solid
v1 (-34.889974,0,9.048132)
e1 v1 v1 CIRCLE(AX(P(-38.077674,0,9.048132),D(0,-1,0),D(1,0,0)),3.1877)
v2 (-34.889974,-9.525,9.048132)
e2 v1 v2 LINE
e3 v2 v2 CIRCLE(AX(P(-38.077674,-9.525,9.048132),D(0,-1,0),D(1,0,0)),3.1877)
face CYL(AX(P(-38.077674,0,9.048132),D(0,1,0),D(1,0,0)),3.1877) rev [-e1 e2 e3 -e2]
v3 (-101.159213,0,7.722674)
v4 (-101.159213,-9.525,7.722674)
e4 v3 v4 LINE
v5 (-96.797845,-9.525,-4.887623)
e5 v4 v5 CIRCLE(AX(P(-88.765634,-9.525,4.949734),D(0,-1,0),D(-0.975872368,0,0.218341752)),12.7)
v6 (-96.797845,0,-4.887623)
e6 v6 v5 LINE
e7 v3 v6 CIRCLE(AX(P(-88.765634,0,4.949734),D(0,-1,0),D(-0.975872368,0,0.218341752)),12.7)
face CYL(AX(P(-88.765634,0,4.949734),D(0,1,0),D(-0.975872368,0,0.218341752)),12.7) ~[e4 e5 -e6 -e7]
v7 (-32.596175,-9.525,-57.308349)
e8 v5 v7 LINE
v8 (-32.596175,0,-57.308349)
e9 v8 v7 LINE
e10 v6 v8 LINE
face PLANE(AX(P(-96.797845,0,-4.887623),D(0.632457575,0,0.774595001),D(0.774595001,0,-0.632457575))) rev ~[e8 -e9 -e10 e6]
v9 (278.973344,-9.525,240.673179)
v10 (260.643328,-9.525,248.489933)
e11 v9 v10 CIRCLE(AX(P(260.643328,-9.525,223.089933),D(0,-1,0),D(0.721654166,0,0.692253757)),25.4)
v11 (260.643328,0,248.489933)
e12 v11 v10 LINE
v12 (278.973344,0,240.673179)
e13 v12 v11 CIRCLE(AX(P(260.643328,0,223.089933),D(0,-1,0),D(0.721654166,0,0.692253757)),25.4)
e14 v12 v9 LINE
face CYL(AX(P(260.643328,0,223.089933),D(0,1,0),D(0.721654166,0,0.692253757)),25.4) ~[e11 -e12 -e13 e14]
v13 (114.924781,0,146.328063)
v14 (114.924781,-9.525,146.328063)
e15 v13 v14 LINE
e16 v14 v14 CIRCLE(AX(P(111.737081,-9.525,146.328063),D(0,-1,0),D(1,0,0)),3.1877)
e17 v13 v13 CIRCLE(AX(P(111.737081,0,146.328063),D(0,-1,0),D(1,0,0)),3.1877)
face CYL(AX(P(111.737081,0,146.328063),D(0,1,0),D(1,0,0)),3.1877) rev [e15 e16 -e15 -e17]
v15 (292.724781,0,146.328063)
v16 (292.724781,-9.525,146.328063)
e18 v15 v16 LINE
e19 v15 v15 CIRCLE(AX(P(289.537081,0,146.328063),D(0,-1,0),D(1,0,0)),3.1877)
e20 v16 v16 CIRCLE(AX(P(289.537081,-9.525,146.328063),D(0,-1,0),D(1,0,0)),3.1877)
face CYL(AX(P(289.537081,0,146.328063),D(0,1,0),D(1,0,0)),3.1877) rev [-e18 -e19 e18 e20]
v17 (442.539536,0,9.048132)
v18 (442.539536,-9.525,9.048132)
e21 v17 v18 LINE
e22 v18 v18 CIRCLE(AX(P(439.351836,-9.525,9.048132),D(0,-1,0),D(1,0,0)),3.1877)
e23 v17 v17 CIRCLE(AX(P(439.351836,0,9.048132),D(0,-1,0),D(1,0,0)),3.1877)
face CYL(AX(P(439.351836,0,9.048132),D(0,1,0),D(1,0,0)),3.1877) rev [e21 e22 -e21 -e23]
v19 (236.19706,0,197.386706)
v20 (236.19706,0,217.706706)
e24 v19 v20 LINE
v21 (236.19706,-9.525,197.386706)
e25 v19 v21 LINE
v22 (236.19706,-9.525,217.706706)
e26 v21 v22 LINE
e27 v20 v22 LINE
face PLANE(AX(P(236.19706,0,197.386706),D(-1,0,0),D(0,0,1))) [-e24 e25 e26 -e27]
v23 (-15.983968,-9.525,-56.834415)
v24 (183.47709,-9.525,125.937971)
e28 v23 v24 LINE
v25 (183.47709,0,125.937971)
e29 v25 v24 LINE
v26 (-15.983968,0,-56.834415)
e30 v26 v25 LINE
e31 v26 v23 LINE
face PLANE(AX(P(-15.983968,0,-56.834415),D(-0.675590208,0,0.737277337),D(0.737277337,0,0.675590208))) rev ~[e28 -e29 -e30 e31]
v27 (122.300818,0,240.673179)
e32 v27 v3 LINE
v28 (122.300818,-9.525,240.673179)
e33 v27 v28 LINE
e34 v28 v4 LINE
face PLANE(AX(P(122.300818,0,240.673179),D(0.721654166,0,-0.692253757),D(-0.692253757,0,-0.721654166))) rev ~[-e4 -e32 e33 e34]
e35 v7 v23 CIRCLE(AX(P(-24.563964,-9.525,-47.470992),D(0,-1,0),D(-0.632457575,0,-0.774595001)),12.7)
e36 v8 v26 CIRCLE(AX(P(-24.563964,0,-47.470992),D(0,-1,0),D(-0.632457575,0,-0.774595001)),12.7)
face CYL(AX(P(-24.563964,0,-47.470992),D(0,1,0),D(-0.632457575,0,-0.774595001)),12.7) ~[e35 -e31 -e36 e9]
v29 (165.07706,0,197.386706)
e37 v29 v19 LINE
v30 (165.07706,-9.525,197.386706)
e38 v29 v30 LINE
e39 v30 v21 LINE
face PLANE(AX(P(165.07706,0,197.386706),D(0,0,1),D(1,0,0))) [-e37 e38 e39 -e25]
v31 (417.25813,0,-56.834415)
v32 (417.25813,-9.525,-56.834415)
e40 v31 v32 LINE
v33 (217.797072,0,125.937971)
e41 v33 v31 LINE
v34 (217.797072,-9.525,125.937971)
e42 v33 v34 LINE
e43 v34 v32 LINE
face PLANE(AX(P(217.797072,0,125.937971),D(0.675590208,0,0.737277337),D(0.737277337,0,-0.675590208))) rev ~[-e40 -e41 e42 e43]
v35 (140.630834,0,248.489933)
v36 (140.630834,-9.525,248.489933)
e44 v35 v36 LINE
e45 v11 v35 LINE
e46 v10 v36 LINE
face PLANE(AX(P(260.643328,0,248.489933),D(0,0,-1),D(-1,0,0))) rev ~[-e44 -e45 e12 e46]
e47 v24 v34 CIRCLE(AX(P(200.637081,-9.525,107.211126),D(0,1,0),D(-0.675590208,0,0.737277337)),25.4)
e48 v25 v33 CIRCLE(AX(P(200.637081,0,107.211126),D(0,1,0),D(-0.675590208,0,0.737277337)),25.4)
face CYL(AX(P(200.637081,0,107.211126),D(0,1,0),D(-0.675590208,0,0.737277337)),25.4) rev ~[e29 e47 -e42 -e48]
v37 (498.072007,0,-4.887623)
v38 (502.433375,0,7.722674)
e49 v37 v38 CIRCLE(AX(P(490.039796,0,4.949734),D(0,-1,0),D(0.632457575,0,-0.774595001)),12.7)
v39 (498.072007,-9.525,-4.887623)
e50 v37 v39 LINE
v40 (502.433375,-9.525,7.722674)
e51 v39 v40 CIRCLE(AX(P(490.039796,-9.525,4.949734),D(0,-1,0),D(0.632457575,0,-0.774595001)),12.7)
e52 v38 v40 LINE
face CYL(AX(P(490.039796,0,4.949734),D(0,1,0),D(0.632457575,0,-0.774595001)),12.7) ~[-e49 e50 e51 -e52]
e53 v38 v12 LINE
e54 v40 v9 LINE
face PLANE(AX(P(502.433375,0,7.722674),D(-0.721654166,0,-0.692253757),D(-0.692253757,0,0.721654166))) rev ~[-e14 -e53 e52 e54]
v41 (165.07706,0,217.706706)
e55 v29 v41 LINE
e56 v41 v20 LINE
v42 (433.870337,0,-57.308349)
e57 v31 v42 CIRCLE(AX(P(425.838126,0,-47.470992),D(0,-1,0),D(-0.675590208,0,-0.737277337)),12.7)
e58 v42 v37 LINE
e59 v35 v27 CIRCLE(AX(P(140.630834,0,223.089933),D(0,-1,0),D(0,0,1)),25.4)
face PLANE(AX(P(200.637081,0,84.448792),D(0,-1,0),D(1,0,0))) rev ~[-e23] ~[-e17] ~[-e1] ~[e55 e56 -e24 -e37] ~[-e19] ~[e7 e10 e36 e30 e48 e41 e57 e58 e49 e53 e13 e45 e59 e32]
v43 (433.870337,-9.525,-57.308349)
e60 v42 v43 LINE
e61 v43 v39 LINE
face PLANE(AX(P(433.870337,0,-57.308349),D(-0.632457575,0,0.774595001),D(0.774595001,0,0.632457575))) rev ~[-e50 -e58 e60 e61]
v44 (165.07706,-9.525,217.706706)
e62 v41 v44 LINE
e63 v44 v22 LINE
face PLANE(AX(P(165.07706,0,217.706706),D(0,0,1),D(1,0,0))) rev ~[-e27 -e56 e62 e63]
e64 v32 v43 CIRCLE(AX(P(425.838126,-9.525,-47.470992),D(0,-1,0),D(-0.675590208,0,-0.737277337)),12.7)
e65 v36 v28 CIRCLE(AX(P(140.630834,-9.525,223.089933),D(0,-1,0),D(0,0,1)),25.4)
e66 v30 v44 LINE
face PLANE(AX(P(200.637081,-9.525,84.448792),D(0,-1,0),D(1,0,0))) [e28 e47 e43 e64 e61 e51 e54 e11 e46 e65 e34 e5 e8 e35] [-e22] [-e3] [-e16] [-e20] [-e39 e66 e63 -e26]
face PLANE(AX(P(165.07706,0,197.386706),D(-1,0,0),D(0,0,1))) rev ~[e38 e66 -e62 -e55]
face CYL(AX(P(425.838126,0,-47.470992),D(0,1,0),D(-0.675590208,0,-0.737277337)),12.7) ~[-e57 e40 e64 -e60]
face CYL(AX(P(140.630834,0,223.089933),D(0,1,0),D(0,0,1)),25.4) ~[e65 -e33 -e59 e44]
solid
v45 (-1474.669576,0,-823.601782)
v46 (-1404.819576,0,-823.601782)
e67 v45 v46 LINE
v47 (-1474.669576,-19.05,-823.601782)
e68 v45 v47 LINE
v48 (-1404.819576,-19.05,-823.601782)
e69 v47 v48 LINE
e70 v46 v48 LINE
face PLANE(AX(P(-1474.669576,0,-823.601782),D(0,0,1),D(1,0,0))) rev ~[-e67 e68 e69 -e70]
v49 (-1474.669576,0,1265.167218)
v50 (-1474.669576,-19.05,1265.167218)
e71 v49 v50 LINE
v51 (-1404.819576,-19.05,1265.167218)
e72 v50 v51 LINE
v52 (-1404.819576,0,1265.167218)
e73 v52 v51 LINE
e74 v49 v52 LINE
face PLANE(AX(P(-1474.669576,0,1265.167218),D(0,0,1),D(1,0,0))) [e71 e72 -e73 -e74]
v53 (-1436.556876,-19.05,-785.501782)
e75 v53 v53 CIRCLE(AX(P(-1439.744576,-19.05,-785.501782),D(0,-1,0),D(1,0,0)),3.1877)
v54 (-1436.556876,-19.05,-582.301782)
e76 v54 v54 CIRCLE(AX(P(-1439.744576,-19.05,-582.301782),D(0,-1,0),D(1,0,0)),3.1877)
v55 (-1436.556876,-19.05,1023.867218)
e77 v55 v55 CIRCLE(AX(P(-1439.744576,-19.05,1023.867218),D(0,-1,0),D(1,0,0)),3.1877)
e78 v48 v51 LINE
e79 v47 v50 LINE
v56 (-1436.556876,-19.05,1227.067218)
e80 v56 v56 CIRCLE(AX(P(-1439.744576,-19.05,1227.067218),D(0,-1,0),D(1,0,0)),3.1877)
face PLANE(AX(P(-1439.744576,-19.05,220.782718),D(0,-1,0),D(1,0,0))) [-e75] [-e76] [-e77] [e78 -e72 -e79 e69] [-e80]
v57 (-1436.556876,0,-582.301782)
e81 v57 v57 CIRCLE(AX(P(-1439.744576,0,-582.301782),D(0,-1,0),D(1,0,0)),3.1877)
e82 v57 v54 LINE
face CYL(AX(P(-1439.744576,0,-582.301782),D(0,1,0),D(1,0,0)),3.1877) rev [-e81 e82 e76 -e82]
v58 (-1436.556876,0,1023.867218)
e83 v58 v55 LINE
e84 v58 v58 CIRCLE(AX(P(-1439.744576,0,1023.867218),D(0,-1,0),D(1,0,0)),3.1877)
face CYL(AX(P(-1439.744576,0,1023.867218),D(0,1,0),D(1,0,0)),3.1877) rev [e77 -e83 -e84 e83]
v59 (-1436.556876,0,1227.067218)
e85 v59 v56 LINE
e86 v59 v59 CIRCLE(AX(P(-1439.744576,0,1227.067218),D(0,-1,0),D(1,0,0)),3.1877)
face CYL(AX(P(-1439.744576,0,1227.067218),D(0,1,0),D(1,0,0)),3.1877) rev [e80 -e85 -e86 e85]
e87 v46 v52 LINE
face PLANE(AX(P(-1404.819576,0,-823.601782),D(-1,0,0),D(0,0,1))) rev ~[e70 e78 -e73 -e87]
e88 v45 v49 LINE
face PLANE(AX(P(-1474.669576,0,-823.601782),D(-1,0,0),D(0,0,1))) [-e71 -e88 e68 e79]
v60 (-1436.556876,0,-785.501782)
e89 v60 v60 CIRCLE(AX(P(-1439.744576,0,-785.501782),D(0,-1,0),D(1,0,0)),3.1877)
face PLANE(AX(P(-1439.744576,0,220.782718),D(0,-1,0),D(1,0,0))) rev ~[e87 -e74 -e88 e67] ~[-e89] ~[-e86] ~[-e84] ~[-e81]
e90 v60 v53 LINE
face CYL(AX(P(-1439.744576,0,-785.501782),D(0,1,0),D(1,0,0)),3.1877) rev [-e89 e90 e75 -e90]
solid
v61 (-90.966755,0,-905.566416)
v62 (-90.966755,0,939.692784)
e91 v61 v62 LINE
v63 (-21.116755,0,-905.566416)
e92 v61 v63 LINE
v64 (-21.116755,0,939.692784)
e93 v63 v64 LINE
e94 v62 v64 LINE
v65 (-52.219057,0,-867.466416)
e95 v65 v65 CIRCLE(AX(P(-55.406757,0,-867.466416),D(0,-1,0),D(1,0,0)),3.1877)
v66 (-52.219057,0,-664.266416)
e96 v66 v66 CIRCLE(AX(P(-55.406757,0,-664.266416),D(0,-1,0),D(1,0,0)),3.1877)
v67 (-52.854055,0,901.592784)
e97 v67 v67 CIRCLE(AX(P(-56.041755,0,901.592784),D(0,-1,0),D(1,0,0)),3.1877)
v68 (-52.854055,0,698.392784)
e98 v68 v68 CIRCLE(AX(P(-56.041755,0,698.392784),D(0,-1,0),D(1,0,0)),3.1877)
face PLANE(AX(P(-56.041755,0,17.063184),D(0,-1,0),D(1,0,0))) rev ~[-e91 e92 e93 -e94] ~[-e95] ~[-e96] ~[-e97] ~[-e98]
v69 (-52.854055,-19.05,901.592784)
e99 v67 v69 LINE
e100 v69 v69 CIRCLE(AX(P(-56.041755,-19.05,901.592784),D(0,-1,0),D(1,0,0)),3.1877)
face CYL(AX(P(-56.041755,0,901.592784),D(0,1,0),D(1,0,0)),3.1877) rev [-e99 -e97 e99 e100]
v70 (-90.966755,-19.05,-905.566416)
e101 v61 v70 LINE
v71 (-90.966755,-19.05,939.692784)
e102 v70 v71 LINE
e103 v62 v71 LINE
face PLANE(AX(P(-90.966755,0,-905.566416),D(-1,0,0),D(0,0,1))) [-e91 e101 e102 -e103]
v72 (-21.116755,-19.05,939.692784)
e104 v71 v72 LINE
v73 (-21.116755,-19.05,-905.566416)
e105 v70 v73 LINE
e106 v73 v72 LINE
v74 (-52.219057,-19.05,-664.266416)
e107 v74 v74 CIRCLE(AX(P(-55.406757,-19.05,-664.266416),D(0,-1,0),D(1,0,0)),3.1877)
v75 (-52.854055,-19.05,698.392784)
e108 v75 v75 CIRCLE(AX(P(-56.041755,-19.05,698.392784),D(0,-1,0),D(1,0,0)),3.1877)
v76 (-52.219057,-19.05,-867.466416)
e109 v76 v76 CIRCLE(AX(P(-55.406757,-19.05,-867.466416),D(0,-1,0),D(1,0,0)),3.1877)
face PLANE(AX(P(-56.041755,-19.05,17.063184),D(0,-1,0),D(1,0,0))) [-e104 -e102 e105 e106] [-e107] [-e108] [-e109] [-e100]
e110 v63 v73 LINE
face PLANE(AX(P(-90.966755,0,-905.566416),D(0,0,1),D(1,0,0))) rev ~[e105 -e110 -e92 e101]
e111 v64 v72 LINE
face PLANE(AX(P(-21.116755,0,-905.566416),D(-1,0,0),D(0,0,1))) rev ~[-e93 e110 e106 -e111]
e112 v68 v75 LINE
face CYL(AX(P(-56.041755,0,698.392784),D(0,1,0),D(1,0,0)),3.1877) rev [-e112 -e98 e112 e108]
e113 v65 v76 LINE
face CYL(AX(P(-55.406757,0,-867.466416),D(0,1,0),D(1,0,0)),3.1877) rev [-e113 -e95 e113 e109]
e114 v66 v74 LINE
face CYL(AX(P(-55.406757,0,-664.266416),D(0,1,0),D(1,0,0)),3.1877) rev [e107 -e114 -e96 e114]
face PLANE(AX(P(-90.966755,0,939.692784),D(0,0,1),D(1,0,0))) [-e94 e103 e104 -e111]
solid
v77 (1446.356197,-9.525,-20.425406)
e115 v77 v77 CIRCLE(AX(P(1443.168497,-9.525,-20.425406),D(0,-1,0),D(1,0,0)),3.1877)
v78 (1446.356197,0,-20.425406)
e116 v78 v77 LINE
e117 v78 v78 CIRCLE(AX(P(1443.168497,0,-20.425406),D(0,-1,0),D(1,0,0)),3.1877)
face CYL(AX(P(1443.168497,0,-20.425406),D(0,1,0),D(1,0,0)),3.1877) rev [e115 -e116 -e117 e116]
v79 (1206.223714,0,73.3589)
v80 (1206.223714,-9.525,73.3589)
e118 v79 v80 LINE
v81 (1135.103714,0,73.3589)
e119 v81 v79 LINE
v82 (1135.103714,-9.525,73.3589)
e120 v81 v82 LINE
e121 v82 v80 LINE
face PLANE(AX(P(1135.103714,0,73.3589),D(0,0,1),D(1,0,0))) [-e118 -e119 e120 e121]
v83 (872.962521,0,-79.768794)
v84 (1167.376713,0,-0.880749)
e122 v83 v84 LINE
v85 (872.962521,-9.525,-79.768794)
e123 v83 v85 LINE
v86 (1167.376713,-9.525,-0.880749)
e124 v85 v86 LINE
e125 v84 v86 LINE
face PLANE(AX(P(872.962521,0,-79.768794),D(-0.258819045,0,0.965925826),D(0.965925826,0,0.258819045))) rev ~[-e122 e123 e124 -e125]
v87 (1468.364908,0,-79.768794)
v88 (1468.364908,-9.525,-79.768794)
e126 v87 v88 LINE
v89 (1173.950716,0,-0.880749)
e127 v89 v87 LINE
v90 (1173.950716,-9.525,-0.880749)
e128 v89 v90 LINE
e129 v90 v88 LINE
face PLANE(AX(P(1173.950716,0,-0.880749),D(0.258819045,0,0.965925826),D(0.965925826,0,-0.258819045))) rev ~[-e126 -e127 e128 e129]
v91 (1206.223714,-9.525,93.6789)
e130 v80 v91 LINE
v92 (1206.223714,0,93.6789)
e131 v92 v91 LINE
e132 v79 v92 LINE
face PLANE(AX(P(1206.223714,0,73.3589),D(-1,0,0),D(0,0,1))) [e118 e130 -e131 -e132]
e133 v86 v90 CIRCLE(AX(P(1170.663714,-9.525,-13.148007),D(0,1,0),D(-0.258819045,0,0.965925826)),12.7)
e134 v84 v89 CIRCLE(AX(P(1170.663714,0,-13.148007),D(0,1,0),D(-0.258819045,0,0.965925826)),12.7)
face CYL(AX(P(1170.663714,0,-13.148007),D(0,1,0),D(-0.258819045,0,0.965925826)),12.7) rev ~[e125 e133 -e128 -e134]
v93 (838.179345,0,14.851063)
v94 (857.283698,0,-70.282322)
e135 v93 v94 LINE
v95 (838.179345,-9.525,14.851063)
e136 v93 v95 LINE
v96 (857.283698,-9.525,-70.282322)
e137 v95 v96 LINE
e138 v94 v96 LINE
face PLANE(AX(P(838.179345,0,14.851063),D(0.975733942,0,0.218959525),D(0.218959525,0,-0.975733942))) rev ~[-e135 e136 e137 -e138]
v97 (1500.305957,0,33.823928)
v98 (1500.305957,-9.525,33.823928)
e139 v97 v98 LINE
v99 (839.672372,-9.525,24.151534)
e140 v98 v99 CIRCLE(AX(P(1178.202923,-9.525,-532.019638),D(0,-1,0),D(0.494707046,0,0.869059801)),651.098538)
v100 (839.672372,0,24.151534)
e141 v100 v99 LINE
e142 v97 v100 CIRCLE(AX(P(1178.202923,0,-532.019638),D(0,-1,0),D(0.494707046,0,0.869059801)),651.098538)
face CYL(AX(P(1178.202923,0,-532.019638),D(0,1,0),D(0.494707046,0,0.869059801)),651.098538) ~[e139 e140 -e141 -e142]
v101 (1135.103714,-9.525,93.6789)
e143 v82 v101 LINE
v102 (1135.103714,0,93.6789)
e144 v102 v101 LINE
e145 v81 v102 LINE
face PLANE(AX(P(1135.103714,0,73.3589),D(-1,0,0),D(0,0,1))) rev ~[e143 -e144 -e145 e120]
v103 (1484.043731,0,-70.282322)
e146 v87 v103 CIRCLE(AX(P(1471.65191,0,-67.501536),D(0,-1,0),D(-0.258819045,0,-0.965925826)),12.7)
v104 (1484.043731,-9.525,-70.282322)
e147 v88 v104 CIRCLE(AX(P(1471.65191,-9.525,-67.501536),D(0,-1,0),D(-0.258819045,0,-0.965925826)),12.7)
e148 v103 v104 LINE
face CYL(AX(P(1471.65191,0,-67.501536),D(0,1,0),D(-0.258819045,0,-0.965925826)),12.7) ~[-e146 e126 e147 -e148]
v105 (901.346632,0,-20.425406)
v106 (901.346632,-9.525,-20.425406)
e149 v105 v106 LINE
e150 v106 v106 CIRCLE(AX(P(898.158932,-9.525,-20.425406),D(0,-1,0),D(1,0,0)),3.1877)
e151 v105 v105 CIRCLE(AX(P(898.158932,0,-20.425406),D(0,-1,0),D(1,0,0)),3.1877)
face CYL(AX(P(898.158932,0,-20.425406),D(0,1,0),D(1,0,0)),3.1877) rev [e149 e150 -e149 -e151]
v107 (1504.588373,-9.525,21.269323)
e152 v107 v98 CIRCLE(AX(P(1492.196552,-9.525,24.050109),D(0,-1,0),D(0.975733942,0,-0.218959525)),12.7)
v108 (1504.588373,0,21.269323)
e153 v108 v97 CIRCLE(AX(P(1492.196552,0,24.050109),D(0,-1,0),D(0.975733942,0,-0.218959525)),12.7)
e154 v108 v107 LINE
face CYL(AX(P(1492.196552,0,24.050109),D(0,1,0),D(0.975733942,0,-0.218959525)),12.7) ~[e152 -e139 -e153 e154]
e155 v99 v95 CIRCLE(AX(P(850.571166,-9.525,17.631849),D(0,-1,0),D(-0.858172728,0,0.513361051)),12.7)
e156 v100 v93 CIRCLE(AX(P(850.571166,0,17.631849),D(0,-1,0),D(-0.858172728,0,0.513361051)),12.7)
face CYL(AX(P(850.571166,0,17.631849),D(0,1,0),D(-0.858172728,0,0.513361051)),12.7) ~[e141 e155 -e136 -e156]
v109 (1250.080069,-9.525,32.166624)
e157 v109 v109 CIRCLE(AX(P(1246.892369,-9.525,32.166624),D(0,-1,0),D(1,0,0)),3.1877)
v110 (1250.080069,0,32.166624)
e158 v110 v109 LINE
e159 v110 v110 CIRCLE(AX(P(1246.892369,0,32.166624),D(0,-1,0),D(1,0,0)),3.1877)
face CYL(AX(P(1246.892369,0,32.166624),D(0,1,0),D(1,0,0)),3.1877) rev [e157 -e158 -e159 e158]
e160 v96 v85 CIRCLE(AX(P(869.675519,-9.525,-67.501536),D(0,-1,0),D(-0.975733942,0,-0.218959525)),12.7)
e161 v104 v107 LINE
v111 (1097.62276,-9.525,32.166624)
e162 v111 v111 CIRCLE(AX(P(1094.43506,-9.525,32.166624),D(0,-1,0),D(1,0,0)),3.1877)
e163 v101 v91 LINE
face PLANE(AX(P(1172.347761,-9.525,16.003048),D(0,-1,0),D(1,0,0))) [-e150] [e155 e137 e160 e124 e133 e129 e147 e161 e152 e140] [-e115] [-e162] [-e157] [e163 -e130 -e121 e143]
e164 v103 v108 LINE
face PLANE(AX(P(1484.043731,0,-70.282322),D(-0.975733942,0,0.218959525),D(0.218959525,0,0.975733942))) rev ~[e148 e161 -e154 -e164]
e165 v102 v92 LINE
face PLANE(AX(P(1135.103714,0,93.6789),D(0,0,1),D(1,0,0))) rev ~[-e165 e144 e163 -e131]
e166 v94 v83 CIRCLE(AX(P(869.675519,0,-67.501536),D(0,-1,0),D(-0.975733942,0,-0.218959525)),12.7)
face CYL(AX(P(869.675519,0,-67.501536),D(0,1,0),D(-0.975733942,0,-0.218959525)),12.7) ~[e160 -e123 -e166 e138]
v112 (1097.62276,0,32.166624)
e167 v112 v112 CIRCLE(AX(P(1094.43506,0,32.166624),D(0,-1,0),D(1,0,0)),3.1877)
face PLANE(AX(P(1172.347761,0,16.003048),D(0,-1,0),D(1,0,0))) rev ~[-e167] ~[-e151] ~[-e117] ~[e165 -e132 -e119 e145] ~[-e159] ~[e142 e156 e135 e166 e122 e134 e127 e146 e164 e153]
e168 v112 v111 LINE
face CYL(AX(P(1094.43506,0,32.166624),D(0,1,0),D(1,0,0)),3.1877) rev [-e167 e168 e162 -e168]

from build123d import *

# Parameters (mm, degrees)
F0_R     = 3.1877
F0_W     = 71.12
F0_H     = 20.32
F1_DEPTH = 9.525
F2_R     = 3.1877
F2_W     = 71.12
F2_H     = 20.32
F3_DEPTH = 9.525
F0_W_2   = 69.85
F0_H_2   = 2088.769
F4_DEPTH = 19.05
F0_H_3   = 1845.2592


# Not quite as in the source:
# - a length typed as a fraction of an inch, garbled in the dataset ("3 / 203.2 mm" for 3/8 in), is restored


with BuildPart() as f1:
    # F0 (on Front) → F1 (new body)
    with BuildSketch(Plane.XZ):
        with BuildLine():
            ThreePointArc((839.6723722923, 24.1515339259), (838.0317131921, 19.644837613), (838.1793448674, 14.8510626048))
            Line((838.1793448674, 14.8510626048), (857.2836977415, -70.2823224184))
            ThreePointArc((857.2836977415, -70.2823224184), (863.1011199006, -78.3674132665), (872.9625206832, -79.7687944446))
            Line((872.9625206832, -79.7687944446), (1167.3767125361, -0.8807494973))
            ThreePointArc((1167.3767125361, -0.8807494973), (1170.6637144089, -0.4480074912), (1173.9507162817, -0.8807494973))
            Line((1173.9507162817, -0.8807494973), (1468.3649081346, -79.7687944446))
            ThreePointArc((1468.3649081346, -79.7687944446), (1478.2263089171, -78.3674132665), (1484.0437310762, -70.2823224184))
            Line((1484.0437310762, -70.2823224184), (1504.5883732454, 21.2693225641))
            ThreePointArc((1504.5883732454, 21.2693225641), (1504.2165188216, 28.1501575378), (1500.3059571794, 33.8239281792))
            ThreePointArc((1500.3059571794, 33.8239281792), (1168.6711535979, 119.0091259816), (839.6723722923, 24.1515339259))
        make_face()
        with Locations((898.1589318866, -20.4254064456)):
            Circle(F0_R, mode=Mode.SUBTRACT)
        with Locations((1094.4350597885, 32.1666235192)):
            Circle(F0_R, mode=Mode.SUBTRACT)
        with Locations((1246.8923690293, 32.1666235192)):
            Circle(F0_R, mode=Mode.SUBTRACT)
        with Locations((1443.1684969312, -20.4254064456)):
            Circle(F0_R, mode=Mode.SUBTRACT)
        with Locations((1170.6637144089, 83.5188999772)):
            Rectangle(F0_W, F0_H, mode=Mode.SUBTRACT)
    extrude(amount=F1_DEPTH)


with BuildPart() as f3:
    # F2 (on Front) → F3 (new body)
    with BuildSketch(Plane.XZ):
        with BuildLine():
            ThreePointArc((-101.1592128677, 7.7226741622), (-100.7680553509, 0.798604341), (-96.7978449984, -4.8876226022))
            Line((-96.7978449984, -4.8876226022), (-32.5961750252, -57.3083489018))
            ThreePointArc((-32.5961750252, -57.3083489018), (-24.2017892971, -60.1658271529), (-15.9839681804, -56.8344145691))
            Line((-15.9839681804, -56.8344145691), (183.4770895885, 125.9379706671))
            ThreePointArc((183.4770895885, 125.9379706671), (200.6370808619, 132.6111263121), (217.7970721354, 125.9379706671))
            Line((217.7970721354, 125.9379706671), (417.2581299043, -56.8344145691))
            ThreePointArc((417.2581299043, -56.8344145691), (425.4759510209, -60.1658271529), (433.8703367491, -57.3083489018))
            Line((433.8703367491, -57.3083489018), (498.0720067222, -4.8876226022))
            ThreePointArc((498.0720067222, -4.8876226022), (502.0422170747, 0.798604341), (502.4333745915, 7.7226741622))
            Line((502.4333745915, 7.7226741622), (278.9733440379, 240.6731787355))
            ThreePointArc((278.9733440379, 240.6731787355), (270.6069010187, 246.4541627355), (260.6433282158, 248.4899333025))
            Line((260.6433282158, 248.4899333025), (200.6370808619, 248.4899333025))
            Line((200.6370808619, 248.4899333025), (140.6308335081, 248.4899333025))
            ThreePointArc((140.6308335081, 248.4899333025), (130.6672607051, 246.4541627355), (122.3008176859, 240.6731787355))
            Line((122.3008176859, 240.6731787355), (-101.1592128677, 7.7226741622))
        make_face()
        with Locations((-38.0776739779, 9.0481323209)):
            Circle(F2_R, mode=Mode.SUBTRACT)
        with Locations((111.7370808619, 146.3280625084)):
            Circle(F2_R, mode=Mode.SUBTRACT)
        with Locations((439.3518357017, 9.0481323209)):
            Circle(F2_R, mode=Mode.SUBTRACT)
        with Locations((289.5370808619, 146.3280625084)):
            Circle(F2_R, mode=Mode.SUBTRACT)
        with Locations((200.637060461, 207.5467059735)):
            Rectangle(F2_W, F2_H, mode=Mode.SUBTRACT)
    extrude(amount=F3_DEPTH)


with BuildPart() as f4:
    # F0 (on Front) → F4 (new body)
    with BuildSketch(Plane.XZ):
        with Locations((-1439.7445756912, 220.7827176781)):
            Rectangle(F0_W_2, F0_H_2)
        with Locations((-1439.7445756912, -785.5017823219)):
            Circle(F0_R, mode=Mode.SUBTRACT)
        with Locations((-1439.7445756912, -582.3017823219)):
            Circle(F0_R, mode=Mode.SUBTRACT)
        with Locations((-1439.7445756912, 1023.8672176781)):
            Circle(F0_R, mode=Mode.SUBTRACT)
        with Locations((-1439.7445756912, 1227.0672176781)):
            Circle(F0_R, mode=Mode.SUBTRACT)
    extrude(amount=F4_DEPTH)


with BuildPart() as f4b:
    # F0 (on Front) → F4, piece 2 (new body)
    with BuildSketch(Plane.XZ):
        with Locations((-56.0417547822, 17.06318371)):
            Rectangle(F0_W_2, F0_H_3)
        with Locations((-55.4067566991, -867.46641629)):
            Circle(F0_R, mode=Mode.SUBTRACT)
        with Locations((-55.4067566991, -664.26641629)):
            Circle(F0_R, mode=Mode.SUBTRACT)
        with Locations((-56.0417547822, 698.39278371)):
            Circle(F0_R, mode=Mode.SUBTRACT)
        with Locations((-56.0417547822, 901.59278371)):
            Circle(F0_R, mode=Mode.SUBTRACT)
    extrude(amount=F4_DEPTH)


solid = Compound([f1.part, f3.part, f4.part, f4b.part])
